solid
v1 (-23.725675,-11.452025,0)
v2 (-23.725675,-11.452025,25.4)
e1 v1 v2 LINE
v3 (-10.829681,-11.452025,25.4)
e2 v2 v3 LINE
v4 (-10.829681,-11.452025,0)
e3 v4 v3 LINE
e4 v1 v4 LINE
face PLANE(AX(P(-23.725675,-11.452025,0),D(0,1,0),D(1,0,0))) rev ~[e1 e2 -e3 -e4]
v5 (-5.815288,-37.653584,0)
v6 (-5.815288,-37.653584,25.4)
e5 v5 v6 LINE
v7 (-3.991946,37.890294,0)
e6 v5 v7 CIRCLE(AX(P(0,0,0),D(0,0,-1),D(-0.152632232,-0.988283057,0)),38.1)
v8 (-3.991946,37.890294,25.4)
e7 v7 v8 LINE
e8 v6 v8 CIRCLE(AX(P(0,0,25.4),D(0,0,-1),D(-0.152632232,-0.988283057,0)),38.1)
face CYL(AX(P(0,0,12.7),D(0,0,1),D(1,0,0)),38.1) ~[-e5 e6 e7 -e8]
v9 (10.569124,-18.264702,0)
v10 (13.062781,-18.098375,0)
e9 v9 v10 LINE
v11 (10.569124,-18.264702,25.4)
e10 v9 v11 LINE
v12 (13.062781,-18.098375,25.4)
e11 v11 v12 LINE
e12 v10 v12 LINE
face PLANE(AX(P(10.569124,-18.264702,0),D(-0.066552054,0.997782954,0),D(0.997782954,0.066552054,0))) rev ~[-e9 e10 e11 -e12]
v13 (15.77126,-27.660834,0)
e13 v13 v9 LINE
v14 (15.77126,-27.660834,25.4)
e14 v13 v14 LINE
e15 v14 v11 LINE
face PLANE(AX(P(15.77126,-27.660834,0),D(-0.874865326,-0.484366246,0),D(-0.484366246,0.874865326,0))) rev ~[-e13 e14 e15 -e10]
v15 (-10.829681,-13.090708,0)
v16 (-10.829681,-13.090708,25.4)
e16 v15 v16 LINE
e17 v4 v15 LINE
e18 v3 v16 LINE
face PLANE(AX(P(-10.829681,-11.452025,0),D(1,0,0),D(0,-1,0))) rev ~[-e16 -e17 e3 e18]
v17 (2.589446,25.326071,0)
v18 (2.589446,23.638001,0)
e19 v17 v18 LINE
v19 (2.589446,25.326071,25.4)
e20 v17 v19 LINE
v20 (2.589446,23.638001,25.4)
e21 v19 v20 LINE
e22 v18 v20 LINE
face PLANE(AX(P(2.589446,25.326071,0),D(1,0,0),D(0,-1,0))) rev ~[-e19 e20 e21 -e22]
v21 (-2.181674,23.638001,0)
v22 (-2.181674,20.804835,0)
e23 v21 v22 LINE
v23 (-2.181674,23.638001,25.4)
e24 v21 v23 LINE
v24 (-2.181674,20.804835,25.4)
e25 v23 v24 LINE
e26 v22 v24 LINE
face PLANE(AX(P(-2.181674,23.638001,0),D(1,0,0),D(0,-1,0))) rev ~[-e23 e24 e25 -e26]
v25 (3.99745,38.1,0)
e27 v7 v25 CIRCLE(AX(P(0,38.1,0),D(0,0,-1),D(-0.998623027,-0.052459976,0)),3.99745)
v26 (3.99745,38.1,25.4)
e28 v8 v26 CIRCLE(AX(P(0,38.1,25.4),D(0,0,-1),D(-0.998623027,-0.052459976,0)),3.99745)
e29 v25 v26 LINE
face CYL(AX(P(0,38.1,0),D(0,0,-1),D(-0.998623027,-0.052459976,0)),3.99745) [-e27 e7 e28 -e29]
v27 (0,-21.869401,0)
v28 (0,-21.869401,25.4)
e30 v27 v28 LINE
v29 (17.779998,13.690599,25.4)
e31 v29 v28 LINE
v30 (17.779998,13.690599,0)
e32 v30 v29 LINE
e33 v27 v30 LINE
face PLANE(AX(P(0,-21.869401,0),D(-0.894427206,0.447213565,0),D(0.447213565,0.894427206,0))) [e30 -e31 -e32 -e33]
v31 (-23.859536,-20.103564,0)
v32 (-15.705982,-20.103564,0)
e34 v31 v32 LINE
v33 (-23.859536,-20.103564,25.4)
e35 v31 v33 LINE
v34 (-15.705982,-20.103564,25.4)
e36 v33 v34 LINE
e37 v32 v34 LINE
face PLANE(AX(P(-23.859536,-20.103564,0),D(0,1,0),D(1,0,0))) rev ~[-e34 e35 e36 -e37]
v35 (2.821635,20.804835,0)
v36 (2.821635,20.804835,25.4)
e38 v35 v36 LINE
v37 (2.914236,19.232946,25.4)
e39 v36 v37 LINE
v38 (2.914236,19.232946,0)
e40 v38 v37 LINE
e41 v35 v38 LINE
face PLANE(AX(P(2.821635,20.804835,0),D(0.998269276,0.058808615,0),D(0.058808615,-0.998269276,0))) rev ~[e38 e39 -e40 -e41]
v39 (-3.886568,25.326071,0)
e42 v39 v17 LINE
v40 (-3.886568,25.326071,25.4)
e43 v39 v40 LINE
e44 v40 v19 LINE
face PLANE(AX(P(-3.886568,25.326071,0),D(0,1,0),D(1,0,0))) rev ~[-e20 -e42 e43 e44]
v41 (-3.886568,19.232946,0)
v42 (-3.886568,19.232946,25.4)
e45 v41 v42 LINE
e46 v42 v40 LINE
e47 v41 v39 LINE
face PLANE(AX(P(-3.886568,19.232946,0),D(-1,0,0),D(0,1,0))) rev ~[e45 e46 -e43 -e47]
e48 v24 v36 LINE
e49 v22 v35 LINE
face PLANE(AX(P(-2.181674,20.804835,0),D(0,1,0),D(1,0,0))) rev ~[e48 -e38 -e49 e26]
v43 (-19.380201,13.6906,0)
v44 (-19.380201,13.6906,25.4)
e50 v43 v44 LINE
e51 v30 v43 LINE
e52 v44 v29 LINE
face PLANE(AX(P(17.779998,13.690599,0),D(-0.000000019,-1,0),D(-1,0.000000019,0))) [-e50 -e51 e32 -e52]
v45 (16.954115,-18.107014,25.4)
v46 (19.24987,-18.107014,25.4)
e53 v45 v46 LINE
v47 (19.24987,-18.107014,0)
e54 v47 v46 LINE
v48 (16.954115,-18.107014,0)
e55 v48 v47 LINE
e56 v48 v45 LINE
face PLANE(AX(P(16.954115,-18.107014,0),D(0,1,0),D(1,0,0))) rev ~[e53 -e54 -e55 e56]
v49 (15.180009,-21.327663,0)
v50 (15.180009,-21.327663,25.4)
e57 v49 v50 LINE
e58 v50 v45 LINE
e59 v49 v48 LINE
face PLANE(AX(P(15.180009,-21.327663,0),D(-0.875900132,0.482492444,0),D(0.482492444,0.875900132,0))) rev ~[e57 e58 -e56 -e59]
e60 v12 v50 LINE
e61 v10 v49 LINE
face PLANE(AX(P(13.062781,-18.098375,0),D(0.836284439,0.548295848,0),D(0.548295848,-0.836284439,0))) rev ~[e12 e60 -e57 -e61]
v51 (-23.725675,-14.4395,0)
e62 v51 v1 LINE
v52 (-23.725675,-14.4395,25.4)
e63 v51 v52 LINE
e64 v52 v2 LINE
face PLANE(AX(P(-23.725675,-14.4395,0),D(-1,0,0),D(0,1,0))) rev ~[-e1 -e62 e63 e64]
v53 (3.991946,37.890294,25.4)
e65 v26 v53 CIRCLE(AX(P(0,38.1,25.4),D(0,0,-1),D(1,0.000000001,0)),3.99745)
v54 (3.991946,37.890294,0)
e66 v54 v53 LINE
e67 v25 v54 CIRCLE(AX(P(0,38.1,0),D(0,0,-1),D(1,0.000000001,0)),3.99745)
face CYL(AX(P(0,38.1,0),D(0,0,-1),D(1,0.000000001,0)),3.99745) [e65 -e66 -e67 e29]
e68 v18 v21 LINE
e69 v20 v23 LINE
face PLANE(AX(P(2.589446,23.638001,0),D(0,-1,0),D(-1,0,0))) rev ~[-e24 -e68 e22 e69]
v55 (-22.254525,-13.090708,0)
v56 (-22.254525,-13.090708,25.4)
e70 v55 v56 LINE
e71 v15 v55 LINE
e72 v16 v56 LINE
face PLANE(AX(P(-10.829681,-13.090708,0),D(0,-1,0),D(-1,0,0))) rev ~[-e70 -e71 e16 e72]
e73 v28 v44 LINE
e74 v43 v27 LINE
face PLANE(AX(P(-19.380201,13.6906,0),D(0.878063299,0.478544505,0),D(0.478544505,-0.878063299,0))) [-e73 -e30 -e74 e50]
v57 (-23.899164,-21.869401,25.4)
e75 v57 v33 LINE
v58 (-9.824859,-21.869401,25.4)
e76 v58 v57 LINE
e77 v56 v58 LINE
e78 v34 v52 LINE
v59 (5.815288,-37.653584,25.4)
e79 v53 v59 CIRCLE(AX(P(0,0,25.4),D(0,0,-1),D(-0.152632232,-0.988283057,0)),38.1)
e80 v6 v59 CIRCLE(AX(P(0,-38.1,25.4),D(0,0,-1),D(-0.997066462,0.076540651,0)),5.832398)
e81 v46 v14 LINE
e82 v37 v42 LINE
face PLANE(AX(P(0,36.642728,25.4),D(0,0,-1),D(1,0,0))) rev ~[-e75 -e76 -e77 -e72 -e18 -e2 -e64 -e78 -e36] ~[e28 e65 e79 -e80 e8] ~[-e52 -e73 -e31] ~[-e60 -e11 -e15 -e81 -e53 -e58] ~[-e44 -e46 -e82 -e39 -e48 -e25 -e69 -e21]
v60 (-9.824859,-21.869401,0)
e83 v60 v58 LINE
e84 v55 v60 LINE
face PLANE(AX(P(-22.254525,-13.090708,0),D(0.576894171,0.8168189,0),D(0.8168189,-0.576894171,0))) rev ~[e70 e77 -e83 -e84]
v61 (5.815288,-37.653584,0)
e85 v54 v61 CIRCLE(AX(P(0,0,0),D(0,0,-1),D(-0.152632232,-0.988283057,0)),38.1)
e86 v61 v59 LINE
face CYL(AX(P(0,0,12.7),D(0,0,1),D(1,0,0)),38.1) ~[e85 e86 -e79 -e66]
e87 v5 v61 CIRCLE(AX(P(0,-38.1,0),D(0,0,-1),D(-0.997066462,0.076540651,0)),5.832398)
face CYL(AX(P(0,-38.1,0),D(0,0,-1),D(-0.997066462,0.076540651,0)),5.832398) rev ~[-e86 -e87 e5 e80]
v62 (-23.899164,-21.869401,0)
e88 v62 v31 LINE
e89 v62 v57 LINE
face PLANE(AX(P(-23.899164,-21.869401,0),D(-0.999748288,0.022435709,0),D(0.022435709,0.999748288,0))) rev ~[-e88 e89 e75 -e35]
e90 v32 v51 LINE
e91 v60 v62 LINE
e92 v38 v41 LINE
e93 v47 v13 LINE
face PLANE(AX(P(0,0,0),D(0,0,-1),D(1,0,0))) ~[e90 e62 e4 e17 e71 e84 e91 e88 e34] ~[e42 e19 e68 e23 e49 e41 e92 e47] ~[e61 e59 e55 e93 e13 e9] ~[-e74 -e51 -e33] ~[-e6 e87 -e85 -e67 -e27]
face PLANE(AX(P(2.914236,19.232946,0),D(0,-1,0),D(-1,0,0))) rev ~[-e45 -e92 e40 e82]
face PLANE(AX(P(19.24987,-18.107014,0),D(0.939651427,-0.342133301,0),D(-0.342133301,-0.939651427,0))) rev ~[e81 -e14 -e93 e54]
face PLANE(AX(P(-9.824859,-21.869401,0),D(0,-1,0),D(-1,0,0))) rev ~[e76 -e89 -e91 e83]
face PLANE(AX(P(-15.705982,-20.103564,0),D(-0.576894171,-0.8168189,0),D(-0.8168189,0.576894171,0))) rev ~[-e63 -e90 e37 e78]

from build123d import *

# Parameters (mm, degrees)
F0_W      = 38.1
F0_H      = 25.4
F3_DEPTH  = 73.8923922181
F5_DEPTH  = 25.4
F7_DEPTH  = 25.4
F9_DEPTH  = 25.4
F11_DEPTH = 25.4
F13_DEPTH = 25.4


# Not quite as in the source:
# - ends of sketch curves that miss each other by under 0.0002 mm in the source are joined


with BuildPart() as f1:
    # F0 (on Front) → F1 (revolve)
    with BuildSketch(Plane.XZ):
        with Locations((19.05, 12.7)):
            Rectangle(F0_W, F0_H)
    revolve(axis=Axis((0, 0, 12.7), (0, 0, -1)))

    # F2 (on Top) → F3 (cut)
    with BuildSketch(Plane.XY):
        Polygon((-19.3802006543, 13.6906001717), (0, -21.8694005162), (17.7799984813, 13.6905994838), align=None)
    extrude(amount=F3_DEPTH, mode=Mode.SUBTRACT)

    # F4 (on face) → F5 (cut)
    with BuildSketch(Plane(origin=(0, 0, 0), x_dir=(1, 0, 0), z_dir=(0, 0, -1))):
        Polygon((-9.8248589784, 21.8694005162), (-23.8991640508, 21.8694005162), (-23.8595362753, 20.1035637146), (-15.7059820649, 20.1035637146), (-23.725675419, 14.439499937), (-23.725675419, 11.4520248026), (-10.8296805993, 11.4520248026), (-10.8296805993, 13.090708293), (-22.2545247525, 13.090708293), align=None)
    extrude(amount=-F5_DEPTH, mode=Mode.SUBTRACT)

    # F6 (on face) → F7 (cut)
    with BuildSketch(Plane(origin=(0, 0, 0), x_dir=(1, 0, 0), z_dir=(0, 0, -1))):
        Polygon((15.7712604851, 27.6608336717), (10.5691235512, 18.2647015899), (13.062780723, 18.0983748287), (15.1800094172, 21.327663213), (16.9541146606, 18.1070137769), (19.2498695105, 18.1070137769), align=None)
    extrude(amount=-F7_DEPTH, mode=Mode.SUBTRACT)

    # F8 (on face) → F9 (cut)
    with BuildSketch(Plane(origin=(0, 0, 0), x_dir=(1, 0, 0), z_dir=(0, 0, -1))):
        Polygon((2.8216354549, -20.8048354834), (2.9142363928, -19.2329455167), (-3.8865676615, -19.2329455167), (-3.8865676615, -25.3260713071), (2.5894464925, -25.3260713071), (2.5894464925, -23.6380007118), (-2.1816743538, -23.6380007118), (-2.1816743538, -20.8048354834), align=None)
    extrude(amount=-F9_DEPTH, mode=Mode.SUBTRACT)

    # F10 (on face) → F11 (cut)
    with BuildSketch(Plane(origin=(0, 0, 0), x_dir=(1, 0, 0), z_dir=(0, 0, -1))):
        with BuildLine():
            ThreePointArc((5.8152880434, 37.6535844904), (0, 38.1), (-5.8152880434, 37.6535844904))
            ThreePointArc((-5.8152880434, 37.6535844904), (0, 32.267602394), (5.8152880434, 37.6535844904))
        make_face()
        with BuildLine():
            ThreePointArc((5.8152880434, 37.6535844904), (5.8281186457, 37.8766283677), (5.832397606, 38.1))
            ThreePointArc((5.832397606, 38.1), (-0.2233716323, 43.9281186457), (-5.8152880434, 37.6535844904))
            ThreePointArc((-5.8152880434, 37.6535844904), (0, 38.1), (5.8152880434, 37.6535844904))
        make_face()
    extrude(amount=-F11_DEPTH, mode=Mode.SUBTRACT)

    # F12 (on face) → F13 (join)
    with BuildSketch(Plane(origin=(0, 0, 0), x_dir=(1, 0, 0), z_dir=(0, 0, -1))):
        with BuildLine():
            ThreePointArc((-3.9919458032, -37.8902938588), (0, -38.1), (3.9919458032, -37.8902938588))
            ThreePointArc((3.9919458032, -37.8902938588), (0, -34.1025498176), (-3.9919458032, -37.8902938588))
        make_face()
        with BuildLine():
            ThreePointArc((-3.9919458032, -37.8902938588), (-0.1048891842, -42.0960738507), (3.9974501824, -38.1))
            ThreePointArc((3.9974501824, -38.1), (3.9960738507, -37.9951108158), (3.9919458032, -37.8902938588))
            ThreePointArc((3.9919458032, -37.8902938588), (0, -38.1), (-3.9919458032, -37.8902938588))
        make_face()
    extrude(amount=-F13_DEPTH)


solid = f1.part
